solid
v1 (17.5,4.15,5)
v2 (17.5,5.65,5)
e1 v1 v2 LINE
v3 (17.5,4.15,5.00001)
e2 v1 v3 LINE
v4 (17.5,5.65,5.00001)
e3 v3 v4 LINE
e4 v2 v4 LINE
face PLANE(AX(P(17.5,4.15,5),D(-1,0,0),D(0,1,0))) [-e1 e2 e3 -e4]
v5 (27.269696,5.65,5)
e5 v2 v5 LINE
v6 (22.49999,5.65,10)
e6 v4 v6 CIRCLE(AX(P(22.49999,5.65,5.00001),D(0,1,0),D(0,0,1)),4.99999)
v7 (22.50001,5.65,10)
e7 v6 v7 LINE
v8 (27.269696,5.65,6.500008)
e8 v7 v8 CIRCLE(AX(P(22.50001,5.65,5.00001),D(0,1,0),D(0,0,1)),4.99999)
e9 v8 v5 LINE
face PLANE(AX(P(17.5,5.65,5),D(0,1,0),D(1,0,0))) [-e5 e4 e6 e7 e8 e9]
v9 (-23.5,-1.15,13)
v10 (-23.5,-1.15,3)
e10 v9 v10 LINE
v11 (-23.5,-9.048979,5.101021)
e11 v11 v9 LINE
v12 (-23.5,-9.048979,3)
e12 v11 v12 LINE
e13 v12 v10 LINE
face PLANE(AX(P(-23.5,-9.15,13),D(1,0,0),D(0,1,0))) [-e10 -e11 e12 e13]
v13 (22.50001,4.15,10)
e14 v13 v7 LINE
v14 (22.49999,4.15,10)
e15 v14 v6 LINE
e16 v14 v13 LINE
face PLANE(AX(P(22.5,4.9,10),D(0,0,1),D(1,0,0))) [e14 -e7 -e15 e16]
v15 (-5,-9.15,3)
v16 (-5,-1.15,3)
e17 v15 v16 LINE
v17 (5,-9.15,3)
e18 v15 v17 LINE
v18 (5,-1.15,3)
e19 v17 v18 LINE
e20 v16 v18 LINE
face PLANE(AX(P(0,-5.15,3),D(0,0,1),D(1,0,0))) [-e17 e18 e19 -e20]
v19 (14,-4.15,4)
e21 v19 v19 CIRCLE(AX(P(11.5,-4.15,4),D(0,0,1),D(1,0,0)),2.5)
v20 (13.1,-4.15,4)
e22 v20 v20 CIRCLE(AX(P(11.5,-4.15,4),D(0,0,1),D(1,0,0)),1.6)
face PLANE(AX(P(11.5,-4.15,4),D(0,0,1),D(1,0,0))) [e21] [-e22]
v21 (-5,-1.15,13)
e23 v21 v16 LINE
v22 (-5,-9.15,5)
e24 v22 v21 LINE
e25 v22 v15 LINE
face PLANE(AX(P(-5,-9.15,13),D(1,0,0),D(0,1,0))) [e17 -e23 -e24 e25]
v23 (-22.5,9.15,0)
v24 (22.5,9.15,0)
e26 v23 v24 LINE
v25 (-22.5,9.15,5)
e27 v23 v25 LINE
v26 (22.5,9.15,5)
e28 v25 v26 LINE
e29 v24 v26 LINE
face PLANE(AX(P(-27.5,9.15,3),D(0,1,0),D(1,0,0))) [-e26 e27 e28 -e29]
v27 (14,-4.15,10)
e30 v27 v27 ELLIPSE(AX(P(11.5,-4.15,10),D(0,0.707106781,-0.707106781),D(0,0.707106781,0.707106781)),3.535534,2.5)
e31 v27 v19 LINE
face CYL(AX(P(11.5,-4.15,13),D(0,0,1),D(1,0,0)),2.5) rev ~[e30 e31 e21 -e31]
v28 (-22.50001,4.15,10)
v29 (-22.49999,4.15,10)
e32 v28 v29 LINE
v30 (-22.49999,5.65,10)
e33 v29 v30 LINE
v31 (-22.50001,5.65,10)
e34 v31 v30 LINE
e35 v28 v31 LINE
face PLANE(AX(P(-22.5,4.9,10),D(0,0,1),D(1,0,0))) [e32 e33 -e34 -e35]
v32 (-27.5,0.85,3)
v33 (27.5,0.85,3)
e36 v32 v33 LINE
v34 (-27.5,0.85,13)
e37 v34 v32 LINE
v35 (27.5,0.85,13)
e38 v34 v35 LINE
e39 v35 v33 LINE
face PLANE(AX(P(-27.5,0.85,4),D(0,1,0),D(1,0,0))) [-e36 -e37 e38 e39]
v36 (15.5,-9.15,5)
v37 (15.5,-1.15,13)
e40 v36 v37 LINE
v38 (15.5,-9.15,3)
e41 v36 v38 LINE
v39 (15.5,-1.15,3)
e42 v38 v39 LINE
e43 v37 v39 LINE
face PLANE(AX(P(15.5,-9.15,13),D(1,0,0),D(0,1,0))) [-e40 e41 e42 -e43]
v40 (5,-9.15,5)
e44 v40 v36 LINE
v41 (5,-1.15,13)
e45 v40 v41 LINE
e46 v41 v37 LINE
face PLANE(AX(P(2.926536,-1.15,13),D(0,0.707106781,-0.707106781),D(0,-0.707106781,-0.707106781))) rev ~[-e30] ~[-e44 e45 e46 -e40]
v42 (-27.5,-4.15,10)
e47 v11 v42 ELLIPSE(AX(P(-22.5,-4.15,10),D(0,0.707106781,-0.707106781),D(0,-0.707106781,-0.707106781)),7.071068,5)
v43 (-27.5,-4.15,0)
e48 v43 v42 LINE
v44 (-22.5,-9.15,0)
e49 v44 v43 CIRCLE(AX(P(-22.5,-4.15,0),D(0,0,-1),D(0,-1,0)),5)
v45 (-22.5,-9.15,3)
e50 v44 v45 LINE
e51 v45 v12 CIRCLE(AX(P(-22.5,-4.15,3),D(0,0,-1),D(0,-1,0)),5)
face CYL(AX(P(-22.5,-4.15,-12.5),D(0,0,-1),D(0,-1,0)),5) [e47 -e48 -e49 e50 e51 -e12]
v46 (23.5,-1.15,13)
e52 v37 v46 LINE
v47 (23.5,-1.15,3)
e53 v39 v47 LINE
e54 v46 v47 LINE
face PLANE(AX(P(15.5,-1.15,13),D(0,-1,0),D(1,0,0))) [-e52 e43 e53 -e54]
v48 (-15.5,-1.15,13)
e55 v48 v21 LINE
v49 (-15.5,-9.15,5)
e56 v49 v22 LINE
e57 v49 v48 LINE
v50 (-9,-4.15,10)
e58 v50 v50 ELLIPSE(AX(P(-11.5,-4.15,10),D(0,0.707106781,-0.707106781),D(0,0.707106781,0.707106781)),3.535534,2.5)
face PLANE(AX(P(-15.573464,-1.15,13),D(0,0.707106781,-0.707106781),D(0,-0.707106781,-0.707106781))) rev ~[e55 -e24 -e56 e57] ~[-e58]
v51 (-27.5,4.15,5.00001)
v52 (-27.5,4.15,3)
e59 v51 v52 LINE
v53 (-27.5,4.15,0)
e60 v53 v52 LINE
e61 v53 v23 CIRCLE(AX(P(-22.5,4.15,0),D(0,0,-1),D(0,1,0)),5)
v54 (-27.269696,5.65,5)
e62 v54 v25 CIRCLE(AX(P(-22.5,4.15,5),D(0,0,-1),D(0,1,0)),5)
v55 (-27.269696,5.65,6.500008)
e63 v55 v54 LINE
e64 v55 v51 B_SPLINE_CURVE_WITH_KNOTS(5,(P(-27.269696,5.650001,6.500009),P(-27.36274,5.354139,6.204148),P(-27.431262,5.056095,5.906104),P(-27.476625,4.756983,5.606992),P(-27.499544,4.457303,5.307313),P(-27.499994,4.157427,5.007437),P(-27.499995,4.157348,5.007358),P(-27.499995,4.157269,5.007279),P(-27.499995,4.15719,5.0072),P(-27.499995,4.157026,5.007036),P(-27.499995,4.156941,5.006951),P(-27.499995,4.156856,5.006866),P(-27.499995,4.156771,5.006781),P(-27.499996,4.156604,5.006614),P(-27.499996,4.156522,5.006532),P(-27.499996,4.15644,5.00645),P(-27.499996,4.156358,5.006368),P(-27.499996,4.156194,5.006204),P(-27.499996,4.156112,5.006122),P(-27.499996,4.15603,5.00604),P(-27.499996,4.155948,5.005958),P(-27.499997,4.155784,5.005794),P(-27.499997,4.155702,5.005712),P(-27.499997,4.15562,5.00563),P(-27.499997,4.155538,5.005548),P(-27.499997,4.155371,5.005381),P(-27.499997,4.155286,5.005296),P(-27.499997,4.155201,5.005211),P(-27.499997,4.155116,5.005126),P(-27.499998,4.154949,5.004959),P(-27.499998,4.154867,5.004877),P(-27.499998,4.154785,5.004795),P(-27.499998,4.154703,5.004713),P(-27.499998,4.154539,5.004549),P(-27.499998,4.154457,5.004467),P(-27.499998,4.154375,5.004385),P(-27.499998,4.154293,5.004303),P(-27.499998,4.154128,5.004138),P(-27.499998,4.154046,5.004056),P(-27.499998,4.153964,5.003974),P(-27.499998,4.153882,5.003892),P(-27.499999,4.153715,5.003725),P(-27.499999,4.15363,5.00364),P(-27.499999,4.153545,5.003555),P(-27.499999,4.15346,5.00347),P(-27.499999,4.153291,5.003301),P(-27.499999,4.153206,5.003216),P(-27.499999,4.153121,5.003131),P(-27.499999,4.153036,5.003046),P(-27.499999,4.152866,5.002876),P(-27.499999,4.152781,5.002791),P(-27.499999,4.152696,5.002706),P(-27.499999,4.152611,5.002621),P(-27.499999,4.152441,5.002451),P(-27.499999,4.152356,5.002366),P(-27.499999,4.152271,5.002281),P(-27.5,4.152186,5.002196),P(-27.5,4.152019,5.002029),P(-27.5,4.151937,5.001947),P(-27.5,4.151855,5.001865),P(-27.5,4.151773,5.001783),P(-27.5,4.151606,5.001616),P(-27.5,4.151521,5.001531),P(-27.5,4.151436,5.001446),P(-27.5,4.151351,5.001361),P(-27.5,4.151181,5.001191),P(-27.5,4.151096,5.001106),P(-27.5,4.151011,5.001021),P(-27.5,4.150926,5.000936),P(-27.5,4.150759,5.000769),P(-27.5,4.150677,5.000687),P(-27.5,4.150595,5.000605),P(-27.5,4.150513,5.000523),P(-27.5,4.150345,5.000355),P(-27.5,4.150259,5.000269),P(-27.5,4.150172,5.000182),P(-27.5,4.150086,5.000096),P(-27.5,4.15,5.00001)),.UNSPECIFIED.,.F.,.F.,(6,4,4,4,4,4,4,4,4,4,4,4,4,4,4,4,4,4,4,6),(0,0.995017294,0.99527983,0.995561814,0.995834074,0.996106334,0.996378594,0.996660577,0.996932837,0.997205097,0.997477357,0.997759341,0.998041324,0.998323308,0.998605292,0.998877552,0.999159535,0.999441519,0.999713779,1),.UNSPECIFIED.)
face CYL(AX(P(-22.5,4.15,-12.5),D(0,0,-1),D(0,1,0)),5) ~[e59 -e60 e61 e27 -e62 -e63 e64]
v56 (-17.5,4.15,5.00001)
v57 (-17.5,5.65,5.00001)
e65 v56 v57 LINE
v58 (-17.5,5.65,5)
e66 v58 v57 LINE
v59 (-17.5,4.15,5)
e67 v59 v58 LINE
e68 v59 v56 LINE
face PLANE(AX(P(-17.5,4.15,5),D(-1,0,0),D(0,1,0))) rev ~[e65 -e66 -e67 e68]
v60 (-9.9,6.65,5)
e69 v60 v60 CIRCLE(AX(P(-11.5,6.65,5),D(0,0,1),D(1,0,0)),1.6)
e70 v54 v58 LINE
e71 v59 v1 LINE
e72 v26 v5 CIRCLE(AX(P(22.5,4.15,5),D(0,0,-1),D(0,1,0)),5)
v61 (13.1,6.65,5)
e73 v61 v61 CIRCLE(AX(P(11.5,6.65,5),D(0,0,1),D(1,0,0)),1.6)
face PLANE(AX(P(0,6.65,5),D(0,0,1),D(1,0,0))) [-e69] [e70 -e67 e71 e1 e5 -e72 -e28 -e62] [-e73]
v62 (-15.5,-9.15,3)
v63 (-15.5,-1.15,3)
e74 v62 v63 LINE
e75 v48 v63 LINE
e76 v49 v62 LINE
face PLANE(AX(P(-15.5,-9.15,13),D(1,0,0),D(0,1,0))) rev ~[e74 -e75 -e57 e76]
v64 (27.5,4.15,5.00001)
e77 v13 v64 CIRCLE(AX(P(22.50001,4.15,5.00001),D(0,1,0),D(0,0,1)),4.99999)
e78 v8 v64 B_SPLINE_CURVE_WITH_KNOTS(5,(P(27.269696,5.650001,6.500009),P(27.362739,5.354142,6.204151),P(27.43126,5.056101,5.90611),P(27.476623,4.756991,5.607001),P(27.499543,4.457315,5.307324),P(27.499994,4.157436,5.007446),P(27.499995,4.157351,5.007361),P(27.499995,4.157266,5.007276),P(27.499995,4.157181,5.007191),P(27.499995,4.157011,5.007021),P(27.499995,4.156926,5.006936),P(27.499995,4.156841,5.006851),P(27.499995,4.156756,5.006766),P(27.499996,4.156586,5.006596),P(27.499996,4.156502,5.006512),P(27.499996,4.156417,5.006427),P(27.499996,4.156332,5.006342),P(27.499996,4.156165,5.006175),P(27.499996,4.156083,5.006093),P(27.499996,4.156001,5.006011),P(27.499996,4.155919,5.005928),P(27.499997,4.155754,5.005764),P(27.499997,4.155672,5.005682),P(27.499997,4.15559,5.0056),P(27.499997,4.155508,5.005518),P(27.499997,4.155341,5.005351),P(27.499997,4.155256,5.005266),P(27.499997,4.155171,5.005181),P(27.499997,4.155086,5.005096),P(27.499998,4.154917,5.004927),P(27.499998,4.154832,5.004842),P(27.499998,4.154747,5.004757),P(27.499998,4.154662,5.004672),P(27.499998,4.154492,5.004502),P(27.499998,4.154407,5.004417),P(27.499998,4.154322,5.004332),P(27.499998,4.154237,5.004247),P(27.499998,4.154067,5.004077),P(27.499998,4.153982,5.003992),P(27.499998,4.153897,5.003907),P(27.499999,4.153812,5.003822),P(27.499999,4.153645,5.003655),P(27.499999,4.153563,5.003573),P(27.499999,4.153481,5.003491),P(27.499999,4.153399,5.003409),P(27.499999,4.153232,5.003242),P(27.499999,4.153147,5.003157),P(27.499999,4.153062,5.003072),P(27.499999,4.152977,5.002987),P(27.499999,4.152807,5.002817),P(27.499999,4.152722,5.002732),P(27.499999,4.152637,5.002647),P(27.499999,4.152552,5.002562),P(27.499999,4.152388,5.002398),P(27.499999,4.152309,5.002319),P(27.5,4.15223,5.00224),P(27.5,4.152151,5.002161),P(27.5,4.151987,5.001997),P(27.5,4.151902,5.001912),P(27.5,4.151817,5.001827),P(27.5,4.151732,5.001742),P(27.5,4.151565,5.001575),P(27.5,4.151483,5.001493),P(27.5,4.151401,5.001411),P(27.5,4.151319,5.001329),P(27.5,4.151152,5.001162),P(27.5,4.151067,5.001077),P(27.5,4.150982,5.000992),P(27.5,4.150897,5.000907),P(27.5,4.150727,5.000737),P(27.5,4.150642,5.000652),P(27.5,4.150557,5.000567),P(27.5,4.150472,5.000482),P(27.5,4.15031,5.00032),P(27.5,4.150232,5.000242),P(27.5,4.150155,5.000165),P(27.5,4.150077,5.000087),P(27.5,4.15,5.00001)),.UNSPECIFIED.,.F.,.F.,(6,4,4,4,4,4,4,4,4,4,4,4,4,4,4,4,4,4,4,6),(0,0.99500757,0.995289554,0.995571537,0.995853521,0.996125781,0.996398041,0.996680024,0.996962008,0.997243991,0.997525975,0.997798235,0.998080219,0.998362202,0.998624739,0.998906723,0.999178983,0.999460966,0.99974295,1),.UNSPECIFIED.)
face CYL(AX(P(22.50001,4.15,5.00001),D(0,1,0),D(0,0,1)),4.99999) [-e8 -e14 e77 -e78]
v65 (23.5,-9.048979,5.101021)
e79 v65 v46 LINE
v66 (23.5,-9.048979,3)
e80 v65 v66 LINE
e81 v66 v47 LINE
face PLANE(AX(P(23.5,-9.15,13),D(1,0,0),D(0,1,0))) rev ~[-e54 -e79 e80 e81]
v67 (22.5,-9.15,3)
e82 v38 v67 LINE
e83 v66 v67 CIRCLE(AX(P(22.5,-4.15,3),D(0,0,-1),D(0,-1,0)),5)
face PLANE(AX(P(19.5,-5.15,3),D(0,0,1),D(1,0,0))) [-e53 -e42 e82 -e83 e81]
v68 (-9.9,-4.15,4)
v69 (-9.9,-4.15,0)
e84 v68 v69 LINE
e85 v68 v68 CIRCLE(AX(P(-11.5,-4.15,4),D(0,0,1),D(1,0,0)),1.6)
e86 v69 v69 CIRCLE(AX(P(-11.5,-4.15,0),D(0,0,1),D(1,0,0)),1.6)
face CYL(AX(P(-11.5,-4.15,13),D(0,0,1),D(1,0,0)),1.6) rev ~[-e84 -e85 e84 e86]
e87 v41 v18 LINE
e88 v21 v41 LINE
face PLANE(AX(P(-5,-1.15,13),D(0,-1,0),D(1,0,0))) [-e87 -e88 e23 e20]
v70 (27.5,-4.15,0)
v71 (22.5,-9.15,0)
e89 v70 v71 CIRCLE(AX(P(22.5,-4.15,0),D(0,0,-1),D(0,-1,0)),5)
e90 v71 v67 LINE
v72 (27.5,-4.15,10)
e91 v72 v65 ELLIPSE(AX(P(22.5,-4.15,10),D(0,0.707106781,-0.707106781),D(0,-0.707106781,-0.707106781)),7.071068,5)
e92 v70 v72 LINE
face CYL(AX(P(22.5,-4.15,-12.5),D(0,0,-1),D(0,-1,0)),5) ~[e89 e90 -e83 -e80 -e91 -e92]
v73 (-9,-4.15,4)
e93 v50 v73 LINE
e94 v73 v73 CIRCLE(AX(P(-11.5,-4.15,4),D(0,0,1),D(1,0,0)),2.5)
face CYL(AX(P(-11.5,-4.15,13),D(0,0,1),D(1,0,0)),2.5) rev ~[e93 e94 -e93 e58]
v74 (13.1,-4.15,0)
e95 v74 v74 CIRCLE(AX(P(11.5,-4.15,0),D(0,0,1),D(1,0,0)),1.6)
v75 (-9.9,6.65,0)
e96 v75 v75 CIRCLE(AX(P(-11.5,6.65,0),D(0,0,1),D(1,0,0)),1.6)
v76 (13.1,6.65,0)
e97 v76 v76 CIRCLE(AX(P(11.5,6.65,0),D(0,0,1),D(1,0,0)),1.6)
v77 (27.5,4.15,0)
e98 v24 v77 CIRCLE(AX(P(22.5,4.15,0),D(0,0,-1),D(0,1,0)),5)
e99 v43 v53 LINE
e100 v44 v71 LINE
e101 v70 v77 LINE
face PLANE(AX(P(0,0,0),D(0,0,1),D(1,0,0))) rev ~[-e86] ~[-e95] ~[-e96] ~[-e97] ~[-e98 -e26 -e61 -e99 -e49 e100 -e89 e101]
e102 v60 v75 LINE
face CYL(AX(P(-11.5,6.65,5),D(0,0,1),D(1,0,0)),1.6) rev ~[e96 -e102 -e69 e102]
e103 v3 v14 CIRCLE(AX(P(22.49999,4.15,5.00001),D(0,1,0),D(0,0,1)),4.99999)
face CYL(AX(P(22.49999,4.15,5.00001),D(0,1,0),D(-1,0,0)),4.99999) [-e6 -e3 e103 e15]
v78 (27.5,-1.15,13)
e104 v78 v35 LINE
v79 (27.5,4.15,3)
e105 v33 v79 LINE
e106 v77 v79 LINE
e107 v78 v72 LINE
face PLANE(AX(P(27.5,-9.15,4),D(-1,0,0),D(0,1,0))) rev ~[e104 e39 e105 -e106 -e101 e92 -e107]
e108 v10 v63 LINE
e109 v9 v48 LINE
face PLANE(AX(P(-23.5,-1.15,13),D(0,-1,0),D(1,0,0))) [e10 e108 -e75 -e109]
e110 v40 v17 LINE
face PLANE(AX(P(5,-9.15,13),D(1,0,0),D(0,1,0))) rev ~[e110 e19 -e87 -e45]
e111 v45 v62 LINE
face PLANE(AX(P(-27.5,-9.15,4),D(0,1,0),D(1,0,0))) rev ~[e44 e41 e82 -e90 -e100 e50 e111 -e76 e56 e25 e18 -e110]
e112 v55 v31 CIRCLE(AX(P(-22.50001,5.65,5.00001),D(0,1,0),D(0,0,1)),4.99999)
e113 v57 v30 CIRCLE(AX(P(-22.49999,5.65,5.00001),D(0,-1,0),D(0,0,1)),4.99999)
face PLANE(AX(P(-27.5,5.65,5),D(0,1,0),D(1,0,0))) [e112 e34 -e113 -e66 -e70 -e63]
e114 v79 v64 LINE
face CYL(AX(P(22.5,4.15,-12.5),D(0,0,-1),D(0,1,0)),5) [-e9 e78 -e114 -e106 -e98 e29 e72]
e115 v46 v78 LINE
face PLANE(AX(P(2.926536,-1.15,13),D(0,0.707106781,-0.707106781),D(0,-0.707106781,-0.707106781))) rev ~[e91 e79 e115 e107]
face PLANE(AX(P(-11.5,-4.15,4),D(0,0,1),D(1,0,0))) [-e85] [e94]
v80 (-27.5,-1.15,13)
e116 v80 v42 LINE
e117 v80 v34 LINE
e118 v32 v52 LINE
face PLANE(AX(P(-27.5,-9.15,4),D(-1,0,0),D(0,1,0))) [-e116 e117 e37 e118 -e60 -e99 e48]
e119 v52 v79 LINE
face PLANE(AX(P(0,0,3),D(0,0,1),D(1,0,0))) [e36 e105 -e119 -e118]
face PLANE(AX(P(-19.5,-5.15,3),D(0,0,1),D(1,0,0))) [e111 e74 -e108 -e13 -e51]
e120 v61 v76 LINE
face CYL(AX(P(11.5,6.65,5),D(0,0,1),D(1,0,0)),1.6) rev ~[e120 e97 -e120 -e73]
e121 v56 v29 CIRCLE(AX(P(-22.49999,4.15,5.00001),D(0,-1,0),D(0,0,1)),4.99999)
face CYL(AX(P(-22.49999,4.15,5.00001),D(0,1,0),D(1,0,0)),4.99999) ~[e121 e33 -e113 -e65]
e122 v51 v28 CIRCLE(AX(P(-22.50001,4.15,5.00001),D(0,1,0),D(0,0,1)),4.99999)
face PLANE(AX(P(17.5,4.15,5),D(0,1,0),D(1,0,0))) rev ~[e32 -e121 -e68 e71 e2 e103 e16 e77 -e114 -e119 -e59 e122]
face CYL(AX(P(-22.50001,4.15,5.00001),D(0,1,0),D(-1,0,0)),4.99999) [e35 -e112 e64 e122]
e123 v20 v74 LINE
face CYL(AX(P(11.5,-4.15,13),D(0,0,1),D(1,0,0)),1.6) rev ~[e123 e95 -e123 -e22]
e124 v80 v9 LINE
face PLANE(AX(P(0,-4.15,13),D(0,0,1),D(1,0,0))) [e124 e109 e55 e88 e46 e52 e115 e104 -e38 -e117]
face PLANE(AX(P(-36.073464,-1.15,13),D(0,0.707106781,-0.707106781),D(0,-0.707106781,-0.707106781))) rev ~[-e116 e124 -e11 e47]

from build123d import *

# Parameters (mm, degrees)
F0_W         = 55
F0_H         = 18.3
F1_DEPTH     = 3
F2_W         = 55
F2_H         = 5
F3_DEPTH     = 2
F4_W         = 55
F4_H         = 10
F5_DEPTH     = 1
F6_W         = 10
F6_H         = 1.5
F7_DEPTH     = 5
F8_R         = 4.99999
F9_DEPTH     = 9
F11_R        = 1.6
F12_DEPTH    = 5
F13_R        = 1.6
F14_DEPTH    = 13
F15_W        = 10
F15_H        = 8
F15_W_2      = 8
F16_DEPTH    = 10
F17_R        = 2.5
F18_DEPTH    = 9
F19_T1_DEPTH = 45.1469278075
F19_T3_DEPTH = 51.6469278075
F19_T5_DEPTH = 51.6469278075
F19_T7_DEPTH = 45.1469278075
F20_T1_DEPTH = 30


# Not quite as in the source:
# - a fillet or chamfer that OpenCascade refuses, or shapes differently, is made with other operations: its cross-section is extruded or revolved along the edge and cut away or added
# - a fillet or chamfer is up to 0.001 mm smaller than in the source, because OpenCascade refuses the exact size


with BuildPart() as f1:
    # F0 (on Top) → F1 (new body)
    with BuildSketch(Plane.XY):
        Rectangle(F0_W, F0_H)
    extrude(amount=F1_DEPTH)

    # F2 (on face) → F3 (join)
    with BuildSketch(Plane.XY.offset(3)):
        with Locations((0, 6.65)):
            Rectangle(F2_W, F2_H)
    extrude(amount=F3_DEPTH)

    # F4 (on face) → F5 (join)
    with BuildSketch(Plane.XY.offset(3)):
        with Locations((0, -4.15)):
            Rectangle(F4_W, F4_H)
    extrude(amount=F5_DEPTH)

    # F6 (on face) → F7 (join)
    with BuildSketch(Plane.XY.offset(5)):
        with Locations((22.5, 4.9)):
            Rectangle(F6_W, F6_H)
        with Locations((-22.5, 4.9)):
            Rectangle(F6_W, F6_H)
    extrude(amount=F7_DEPTH)

    # F8 (radius 5 in the source; OpenCascade refuses exactly that, so slightly less here)
    f8_edges = [f1.edges().sort_by_distance(p)[0] for p in [
        (17.5, 4.9, 10),
        (27.5, 4.9, 10),
        (-27.5, 4.9, 10),
        (-17.5, 4.9, 10),
    ]]
    fillet(f8_edges, radius=F8_R)

    # F9 (add): a face of the model
    f9_faces = [f1.faces().sort_by_distance(p)[0] for p in [
        (0, -4.15, 4),
    ]]
    extrude(f9_faces, amount=F9_DEPTH)

    # F11 (on face) → F12 (cut)
    with BuildSketch(Plane.XY.offset(5)):
        with Locations((11.5, 6.65)):
            Circle(F11_R)
        with Locations((-11.5, 6.65)):
            Circle(F11_R)
    extrude(amount=-F12_DEPTH, mode=Mode.SUBTRACT)

    # F13 (on face) → F14 (cut)
    with BuildSketch(Plane.XY.offset(13)):
        with Locations((11.5, -4.15)):
            Circle(F13_R)
        with Locations((-11.5, -4.15)):
            Circle(F13_R)
    extrude(amount=-F14_DEPTH, mode=Mode.SUBTRACT)

    # F15 (on face) → F16 (cut)
    with BuildSketch(Plane.XY.offset(13)):
        with Locations((0, -5.15)):
            Rectangle(F15_W, F15_H)
        with Locations((19.5, -5.15)):
            Rectangle(F15_W_2, F15_H)
        with Locations((-19.5, -5.15)):
            Rectangle(F15_W_2, F15_H)
    extrude(amount=-F16_DEPTH, mode=Mode.SUBTRACT)

    # F17 (on face) → F18 (cut)
    with BuildSketch(Plane.XY.offset(13)):
        with Locations((11.5, -4.15)):
            Circle(F17_R)
        with Locations((-11.5, -4.15)):
            Circle(F17_R)
    extrude(amount=-F18_DEPTH, mode=Mode.SUBTRACT)

    # F19: chamfer of 8 on 4 edges, made by hand

    # F19_s2 → F19_t1 (cut)
    with BuildSketch(Plane.YZ.offset(2.9265360963)):
        Polygon((-1.15, 13), (-9.15, 5), (-9.15, 13), align=None)
    extrude(amount=F19_T1_DEPTH, mode=Mode.SUBTRACT)

    # F19_s4 → F19_t3 (cut)
    with BuildSketch(Plane.YZ.offset(-15.5734639037)):
        Polygon((-1.15, 13), (-9.15, 5), (-9.15, 13), align=None)
    extrude(amount=F19_T3_DEPTH, mode=Mode.SUBTRACT)

    # F19_s6 → F19_t5 (cut)
    with BuildSketch(Plane.YZ.offset(-36.0734639037)):
        Polygon((-1.15, 13), (-9.15, 5), (-9.15, 13), align=None)
    extrude(amount=F19_T5_DEPTH, mode=Mode.SUBTRACT)

    # F19_s8 → F19_t7 (cut)
    with BuildSketch(Plane.YZ.offset(-48.0734639037)):
        Polygon((-1.15, 13), (-9.15, 5), (-9.15, 13), align=None)
    extrude(amount=F19_T7_DEPTH, mode=Mode.SUBTRACT)

    # F20: fillet of radius 5 on 4 edges, made by hand

    # F20_s2 → F20_t1 (cut)
    with BuildSketch(Plane.XY.offset(-12.5)):
        with BuildLine():
            ThreePointArc((22.5, -9.15), (26.0355339059, -7.6855339059), (27.5, -4.15))
            Line((27.5, -4.15), (27.5, -9.15))
            Line((27.5, -9.15), (22.5, -9.15))
        make_face()
        with BuildLine():
            ThreePointArc((22.5, 9.15), (26.0355339059, 7.6855339059), (27.5, 4.15))
            Line((27.5, 4.15), (27.5, 9.15))
            Line((27.5, 9.15), (22.5, 9.15))
        make_face()
        with BuildLine():
            ThreePointArc((-22.5, 9.15), (-26.0355339059, 7.6855339059), (-27.5, 4.15))
            Line((-27.5, 4.15), (-27.5, 9.15))
            Line((-27.5, 9.15), (-22.5, 9.15))
        make_face()
        with BuildLine():
            ThreePointArc((-22.5, -9.15), (-26.0355339059, -7.6855339059), (-27.5, -4.15))
            Line((-27.5, -4.15), (-27.5, -9.15))
            Line((-27.5, -9.15), (-22.5, -9.15))
        make_face()
    extrude(amount=F20_T1_DEPTH, mode=Mode.SUBTRACT)


solid = f1.part
